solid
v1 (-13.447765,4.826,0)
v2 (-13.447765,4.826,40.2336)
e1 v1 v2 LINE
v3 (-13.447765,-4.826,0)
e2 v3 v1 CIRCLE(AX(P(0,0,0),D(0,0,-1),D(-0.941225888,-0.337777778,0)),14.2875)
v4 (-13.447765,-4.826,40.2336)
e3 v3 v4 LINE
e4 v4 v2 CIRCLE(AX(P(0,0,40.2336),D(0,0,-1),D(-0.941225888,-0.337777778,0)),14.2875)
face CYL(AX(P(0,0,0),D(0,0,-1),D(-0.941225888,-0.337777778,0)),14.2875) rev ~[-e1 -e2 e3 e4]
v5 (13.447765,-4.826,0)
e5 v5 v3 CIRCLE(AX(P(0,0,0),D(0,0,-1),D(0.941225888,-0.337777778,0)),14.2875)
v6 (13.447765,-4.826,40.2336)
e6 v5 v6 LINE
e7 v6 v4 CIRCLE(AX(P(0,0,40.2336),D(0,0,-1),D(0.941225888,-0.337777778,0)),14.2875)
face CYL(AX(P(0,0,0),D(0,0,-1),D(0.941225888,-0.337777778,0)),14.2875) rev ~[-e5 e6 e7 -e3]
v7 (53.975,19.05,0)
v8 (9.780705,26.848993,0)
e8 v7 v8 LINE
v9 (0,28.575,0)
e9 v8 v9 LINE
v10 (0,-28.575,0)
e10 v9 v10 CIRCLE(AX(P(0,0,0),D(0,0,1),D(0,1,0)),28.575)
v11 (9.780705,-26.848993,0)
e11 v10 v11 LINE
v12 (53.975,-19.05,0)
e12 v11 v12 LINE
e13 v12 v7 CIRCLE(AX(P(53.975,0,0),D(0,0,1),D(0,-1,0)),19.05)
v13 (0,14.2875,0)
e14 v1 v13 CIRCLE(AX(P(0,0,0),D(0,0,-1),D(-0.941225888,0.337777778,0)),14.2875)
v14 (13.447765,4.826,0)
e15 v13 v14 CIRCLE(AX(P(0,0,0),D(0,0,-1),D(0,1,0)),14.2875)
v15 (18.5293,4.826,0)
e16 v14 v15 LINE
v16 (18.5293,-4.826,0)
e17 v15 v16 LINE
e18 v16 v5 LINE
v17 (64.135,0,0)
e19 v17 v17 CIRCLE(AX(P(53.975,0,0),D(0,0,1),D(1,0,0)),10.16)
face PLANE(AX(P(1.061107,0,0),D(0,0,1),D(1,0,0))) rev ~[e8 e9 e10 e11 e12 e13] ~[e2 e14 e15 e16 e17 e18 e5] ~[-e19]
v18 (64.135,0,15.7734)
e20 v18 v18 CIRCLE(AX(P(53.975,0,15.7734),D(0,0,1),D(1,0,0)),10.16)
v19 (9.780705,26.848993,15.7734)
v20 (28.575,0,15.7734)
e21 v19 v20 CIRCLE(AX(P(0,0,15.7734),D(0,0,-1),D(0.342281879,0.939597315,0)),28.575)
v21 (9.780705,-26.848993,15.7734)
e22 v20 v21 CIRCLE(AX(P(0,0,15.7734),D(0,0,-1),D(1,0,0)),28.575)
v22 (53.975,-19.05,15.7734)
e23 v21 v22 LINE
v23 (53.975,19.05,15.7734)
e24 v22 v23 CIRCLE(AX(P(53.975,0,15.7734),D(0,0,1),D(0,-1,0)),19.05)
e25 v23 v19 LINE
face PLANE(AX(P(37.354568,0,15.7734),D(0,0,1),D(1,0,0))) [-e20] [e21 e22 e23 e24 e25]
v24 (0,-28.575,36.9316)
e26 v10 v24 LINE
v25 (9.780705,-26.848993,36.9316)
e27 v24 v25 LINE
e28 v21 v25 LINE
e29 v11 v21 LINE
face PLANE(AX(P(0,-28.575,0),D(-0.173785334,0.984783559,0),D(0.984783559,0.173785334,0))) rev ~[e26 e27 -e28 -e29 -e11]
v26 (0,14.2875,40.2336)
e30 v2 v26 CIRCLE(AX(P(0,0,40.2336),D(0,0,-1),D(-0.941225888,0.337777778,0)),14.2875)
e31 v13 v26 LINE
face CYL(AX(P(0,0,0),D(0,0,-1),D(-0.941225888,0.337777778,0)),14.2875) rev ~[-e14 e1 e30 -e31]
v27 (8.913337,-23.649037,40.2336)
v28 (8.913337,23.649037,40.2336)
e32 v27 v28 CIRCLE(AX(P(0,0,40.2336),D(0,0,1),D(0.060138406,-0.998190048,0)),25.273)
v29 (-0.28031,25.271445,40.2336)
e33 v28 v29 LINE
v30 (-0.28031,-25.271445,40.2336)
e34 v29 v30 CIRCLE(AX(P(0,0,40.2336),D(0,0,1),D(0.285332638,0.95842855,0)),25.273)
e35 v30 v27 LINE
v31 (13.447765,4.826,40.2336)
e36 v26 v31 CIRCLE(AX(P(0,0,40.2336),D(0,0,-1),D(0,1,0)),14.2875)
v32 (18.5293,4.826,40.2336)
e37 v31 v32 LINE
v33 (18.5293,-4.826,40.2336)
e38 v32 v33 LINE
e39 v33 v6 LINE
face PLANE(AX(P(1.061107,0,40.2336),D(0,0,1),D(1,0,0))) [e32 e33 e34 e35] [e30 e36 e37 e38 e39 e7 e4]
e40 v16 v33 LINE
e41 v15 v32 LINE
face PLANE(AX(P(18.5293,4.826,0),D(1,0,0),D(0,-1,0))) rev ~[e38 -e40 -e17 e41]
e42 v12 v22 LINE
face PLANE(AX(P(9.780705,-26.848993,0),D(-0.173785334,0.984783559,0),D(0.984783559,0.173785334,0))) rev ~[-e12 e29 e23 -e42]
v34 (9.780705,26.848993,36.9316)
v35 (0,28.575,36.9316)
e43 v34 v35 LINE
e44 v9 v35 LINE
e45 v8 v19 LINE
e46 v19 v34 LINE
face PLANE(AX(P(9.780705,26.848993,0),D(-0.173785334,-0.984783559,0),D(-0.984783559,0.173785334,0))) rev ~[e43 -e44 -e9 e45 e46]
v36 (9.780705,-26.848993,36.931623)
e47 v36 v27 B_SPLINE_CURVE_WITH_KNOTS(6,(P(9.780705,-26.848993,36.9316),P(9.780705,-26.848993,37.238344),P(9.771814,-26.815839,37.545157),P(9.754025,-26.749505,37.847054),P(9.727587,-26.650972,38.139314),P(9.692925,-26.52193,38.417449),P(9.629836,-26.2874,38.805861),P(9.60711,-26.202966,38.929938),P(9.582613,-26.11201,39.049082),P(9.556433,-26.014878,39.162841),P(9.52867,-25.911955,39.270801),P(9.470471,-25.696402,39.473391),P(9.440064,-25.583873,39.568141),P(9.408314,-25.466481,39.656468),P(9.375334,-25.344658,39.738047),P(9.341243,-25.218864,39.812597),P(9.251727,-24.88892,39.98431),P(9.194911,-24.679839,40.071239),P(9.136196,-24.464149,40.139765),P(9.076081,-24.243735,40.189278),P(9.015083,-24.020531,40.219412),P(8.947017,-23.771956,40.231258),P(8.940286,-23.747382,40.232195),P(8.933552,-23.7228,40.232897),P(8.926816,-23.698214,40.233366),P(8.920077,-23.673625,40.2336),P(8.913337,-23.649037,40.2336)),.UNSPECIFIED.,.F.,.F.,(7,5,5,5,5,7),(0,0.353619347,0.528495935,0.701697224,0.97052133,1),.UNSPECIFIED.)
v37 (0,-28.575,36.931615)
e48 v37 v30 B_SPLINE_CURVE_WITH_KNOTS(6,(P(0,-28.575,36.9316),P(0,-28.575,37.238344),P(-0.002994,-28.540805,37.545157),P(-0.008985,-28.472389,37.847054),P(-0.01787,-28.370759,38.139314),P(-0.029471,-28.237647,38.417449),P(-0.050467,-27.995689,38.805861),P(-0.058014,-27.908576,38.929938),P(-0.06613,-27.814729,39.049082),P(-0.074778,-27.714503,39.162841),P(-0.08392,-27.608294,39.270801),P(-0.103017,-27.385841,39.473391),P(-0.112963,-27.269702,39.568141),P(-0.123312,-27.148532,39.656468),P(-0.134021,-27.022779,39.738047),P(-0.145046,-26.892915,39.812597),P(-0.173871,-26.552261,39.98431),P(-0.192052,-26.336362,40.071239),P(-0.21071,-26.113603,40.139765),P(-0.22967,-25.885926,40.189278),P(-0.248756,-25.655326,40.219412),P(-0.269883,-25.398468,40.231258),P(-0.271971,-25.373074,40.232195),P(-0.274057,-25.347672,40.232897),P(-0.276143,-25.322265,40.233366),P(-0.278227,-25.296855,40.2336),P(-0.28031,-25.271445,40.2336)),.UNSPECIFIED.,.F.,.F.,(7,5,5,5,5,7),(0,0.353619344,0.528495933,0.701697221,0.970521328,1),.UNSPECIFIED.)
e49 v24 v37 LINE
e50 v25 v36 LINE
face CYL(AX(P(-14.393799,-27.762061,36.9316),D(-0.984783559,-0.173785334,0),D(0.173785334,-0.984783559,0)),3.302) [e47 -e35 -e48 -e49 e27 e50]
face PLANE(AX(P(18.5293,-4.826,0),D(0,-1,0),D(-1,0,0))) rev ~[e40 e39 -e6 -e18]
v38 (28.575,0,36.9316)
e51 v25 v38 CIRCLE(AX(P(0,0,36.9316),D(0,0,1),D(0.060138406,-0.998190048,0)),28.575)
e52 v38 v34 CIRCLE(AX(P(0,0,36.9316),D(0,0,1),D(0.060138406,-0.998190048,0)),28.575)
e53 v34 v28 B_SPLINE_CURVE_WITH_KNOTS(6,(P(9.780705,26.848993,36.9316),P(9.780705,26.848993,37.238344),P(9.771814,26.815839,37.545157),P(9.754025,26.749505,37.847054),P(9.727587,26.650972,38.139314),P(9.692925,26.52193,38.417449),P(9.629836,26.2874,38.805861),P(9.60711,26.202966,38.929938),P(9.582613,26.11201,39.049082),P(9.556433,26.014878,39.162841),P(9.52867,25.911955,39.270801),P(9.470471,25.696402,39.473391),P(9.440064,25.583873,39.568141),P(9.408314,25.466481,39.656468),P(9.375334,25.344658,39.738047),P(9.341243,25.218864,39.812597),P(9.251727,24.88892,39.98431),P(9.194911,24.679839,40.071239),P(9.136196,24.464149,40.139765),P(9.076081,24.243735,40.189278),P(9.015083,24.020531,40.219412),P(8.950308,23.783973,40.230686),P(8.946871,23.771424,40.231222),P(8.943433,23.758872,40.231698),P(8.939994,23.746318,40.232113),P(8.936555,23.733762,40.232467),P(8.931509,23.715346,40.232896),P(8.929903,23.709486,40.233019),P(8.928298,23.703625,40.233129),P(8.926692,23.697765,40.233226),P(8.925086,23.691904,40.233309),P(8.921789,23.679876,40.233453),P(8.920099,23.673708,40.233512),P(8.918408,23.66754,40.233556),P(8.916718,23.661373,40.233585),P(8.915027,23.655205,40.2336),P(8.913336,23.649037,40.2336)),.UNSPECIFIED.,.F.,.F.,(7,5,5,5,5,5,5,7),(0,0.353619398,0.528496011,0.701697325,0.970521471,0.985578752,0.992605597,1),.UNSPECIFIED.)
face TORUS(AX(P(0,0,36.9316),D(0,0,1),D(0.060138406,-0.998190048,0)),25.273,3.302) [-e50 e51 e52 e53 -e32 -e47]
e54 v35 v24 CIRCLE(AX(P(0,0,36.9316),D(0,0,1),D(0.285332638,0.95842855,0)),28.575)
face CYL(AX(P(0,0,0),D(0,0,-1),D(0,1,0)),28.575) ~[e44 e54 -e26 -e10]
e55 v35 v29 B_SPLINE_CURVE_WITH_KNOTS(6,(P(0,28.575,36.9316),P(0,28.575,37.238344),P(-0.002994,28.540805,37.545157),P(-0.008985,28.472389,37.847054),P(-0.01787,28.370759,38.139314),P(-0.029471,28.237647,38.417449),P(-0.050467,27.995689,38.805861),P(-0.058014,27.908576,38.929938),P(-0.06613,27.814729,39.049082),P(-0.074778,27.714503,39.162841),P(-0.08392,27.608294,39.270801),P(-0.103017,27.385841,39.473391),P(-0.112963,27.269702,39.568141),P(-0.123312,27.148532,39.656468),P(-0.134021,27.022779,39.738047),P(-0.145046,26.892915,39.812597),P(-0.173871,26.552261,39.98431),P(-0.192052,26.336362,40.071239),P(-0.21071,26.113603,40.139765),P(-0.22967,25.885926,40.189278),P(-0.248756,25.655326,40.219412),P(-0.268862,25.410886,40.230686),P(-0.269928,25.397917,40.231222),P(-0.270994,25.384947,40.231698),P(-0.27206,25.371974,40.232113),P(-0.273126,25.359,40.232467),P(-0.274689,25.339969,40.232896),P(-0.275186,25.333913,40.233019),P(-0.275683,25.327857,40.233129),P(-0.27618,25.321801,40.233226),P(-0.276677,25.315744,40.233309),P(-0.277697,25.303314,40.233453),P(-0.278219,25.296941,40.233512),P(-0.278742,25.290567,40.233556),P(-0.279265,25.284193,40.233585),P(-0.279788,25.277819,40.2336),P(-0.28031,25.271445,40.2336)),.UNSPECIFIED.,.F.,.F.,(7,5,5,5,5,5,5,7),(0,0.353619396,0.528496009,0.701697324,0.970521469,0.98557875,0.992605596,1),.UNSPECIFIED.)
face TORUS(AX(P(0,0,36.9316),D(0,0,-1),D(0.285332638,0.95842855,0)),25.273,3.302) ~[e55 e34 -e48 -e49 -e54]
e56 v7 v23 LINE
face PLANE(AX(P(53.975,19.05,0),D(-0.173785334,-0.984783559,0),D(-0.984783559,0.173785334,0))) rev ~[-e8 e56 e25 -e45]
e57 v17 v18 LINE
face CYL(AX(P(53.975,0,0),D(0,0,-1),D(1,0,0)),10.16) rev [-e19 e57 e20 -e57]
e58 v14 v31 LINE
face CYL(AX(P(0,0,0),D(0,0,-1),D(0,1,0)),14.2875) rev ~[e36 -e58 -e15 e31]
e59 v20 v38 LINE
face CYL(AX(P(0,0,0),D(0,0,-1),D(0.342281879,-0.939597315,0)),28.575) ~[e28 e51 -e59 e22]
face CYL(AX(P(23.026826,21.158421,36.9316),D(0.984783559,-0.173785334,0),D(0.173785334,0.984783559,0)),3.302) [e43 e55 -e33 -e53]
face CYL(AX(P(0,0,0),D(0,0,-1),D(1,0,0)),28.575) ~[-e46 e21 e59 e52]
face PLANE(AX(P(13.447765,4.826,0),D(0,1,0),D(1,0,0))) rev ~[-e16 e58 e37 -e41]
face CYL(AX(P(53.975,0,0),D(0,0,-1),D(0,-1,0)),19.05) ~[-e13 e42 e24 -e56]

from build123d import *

# Parameters (mm, degrees)
F0_R        = 10.16
F1_DEPTH    = 15.7734
F2_DEPTH    = 40.2336
F3_T1_DEPTH = 37.9988318329
F3_T3_DEPTH = 37.9988318329
F3_T6_ANGLE = 213.1574660215
F3_T8_ANGLE = 173.1044855741


# Not quite as in the source:
# - a fillet or chamfer that OpenCascade refuses, or shapes differently, is made with other operations: its cross-section is extruded or revolved along the edge and cut away or added


with BuildPart() as f1:
    # F0 (on Top) → F1 (new body)
    with BuildSketch(Plane.XY):
        with BuildLine():
            Line((53.975, 19.05), (9.780704698, 26.8489932886))
            ThreePointArc((9.780704698, 26.8489932886), (23.4095521288, 16.3866864902), (28.575, 0))
            ThreePointArc((28.575, 0), (23.4095521288, -16.3866864902), (9.780704698, -26.8489932886))
            Line((9.780704698, -26.8489932886), (53.975, -19.05))
            ThreePointArc((53.975, -19.05), (73.025, 0), (53.975, 19.05))
        make_face()
        with Locations((53.975, 0)):
            Circle(F0_R, mode=Mode.SUBTRACT)
    extrude(amount=F1_DEPTH)

    # F0 (on Top) → F2 (join)
    with BuildSketch(Plane.XY):
        with BuildLine():
            Line((9.780704698, 26.8489932886), (0, 28.575))
            ThreePointArc((0, 28.575), (-28.575, 0), (0, -28.575))
            Line((0, -28.575), (9.780704698, -26.8489932886))
            ThreePointArc((9.780704698, -26.8489932886), (23.4095521288, -16.3866864902), (28.575, 0))
            ThreePointArc((28.575, 0), (23.4095521288, 16.3866864902), (9.780704698, 26.8489932886))
        make_face()
        with BuildLine():
            ThreePointArc((-13.4477648793, 4.826), (-8.2213496839, 11.6851215494), (0, 14.2875))
            ThreePointArc((0, 14.2875), (8.2213496839, 11.6851215494), (13.4477648793, 4.826))
            Line((13.4477648793, 4.826), (18.5293, 4.826))
            Line((18.5293, 4.826), (18.5293, -4.826))
            Line((18.5293, -4.826), (13.4477648793, -4.826))
            ThreePointArc((13.4477648793, -4.826), (0, -14.2875), (-13.4477648793, -4.826))
            Line((-13.4477648793, -4.826), (-18.5293, -4.826))
            Line((-18.5293, -4.826), (-18.5293, 4.826))
            Line((-18.5293, 4.826), (-13.4477648793, 4.826))
        make_face(mode=Mode.SUBTRACT)
        with BuildLine():
            ThreePointArc((-13.4477648793, -4.826), (-14.2875, 0), (-13.4477648793, 4.826))
            Line((-13.4477648793, 4.826), (-18.5293, 4.826))
            Line((-18.5293, 4.826), (-18.5293, -4.826))
            Line((-18.5293, -4.826), (-13.4477648793, -4.826))
        make_face()
    extrude(amount=F2_DEPTH)

    # F3: fillet of radius 3.302 on 4 edges, made by hand

    # F3_s2 → F3_t1 (cut)
    with BuildSketch(Plane(origin=(18.7103124217, -3.3018198391, 0), x_dir=(0, 0, 1), z_dir=(-0.9847835588, 0.1737853339, 0))):
        with BuildLine():
            ThreePointArc((36.9316, 28.1401901932), (39.2664665915, 27.1730567847), (40.2336, 24.8381901932))
            Line((40.2336, 24.8381901932), (40.2336, 28.1401901932))
            Line((40.2336, 28.1401901932), (36.9316, 28.1401901932))
        make_face()
    extrude(amount=F3_T1_DEPTH, mode=Mode.SUBTRACT)

    # F3_s4 → F3_t3 (cut)
    with BuildSketch(Plane(origin=(-18.7103124217, -3.3018198391, 0), x_dir=(0, 0, 1), z_dir=(0.9847835588, 0.1737853339, 0))):
        with BuildLine():
            ThreePointArc((36.9316, 28.1401901932), (39.2664665915, 27.1730567847), (40.2336, 24.8381901932))
            Line((40.2336, 24.8381901932), (40.2336, 28.1401901932))
            Line((40.2336, 28.1401901932), (36.9316, 28.1401901932))
        make_face()
    extrude(amount=F3_T3_DEPTH, mode=Mode.SUBTRACT)

    # F3_s5 → F3_t6 (revolve, cut)
    with BuildSketch(Plane(origin=(0, 0, 0), x_dir=(0, 0, 1), z_dir=(0.95842855, -0.2853326385, 0))):
        with BuildLine():
            ThreePointArc((40.2336, -25.273), (39.2664665915, -27.6078665915), (36.9316, -28.575))
            Line((36.9316, -28.575), (40.2336, -28.575))
            Line((40.2336, -28.575), (40.2336, -25.273))
        make_face()
    revolve(axis=Axis((0, 0, 40.2336), (0, 0, 1)), revolution_arc=F3_T6_ANGLE, mode=Mode.SUBTRACT)

    # F3_s7 → F3_t8 (revolve, cut)
    with BuildSketch(Plane(origin=(0, 0, 0), x_dir=(0, 0, 1), z_dir=(-0.9981900481, -0.0601384063, 0))):
        with BuildLine():
            ThreePointArc((36.9316, -28.575), (39.2664665915, -27.6078665915), (40.2336, -25.273))
            Line((40.2336, -25.273), (40.2336, -28.575))
            Line((40.2336, -28.575), (36.9316, -28.575))
        make_face()
    revolve(axis=Axis((0, 0, 40.2336), (0, 0, 1)), revolution_arc=F3_T8_ANGLE, mode=Mode.SUBTRACT)


solid = f1.part
